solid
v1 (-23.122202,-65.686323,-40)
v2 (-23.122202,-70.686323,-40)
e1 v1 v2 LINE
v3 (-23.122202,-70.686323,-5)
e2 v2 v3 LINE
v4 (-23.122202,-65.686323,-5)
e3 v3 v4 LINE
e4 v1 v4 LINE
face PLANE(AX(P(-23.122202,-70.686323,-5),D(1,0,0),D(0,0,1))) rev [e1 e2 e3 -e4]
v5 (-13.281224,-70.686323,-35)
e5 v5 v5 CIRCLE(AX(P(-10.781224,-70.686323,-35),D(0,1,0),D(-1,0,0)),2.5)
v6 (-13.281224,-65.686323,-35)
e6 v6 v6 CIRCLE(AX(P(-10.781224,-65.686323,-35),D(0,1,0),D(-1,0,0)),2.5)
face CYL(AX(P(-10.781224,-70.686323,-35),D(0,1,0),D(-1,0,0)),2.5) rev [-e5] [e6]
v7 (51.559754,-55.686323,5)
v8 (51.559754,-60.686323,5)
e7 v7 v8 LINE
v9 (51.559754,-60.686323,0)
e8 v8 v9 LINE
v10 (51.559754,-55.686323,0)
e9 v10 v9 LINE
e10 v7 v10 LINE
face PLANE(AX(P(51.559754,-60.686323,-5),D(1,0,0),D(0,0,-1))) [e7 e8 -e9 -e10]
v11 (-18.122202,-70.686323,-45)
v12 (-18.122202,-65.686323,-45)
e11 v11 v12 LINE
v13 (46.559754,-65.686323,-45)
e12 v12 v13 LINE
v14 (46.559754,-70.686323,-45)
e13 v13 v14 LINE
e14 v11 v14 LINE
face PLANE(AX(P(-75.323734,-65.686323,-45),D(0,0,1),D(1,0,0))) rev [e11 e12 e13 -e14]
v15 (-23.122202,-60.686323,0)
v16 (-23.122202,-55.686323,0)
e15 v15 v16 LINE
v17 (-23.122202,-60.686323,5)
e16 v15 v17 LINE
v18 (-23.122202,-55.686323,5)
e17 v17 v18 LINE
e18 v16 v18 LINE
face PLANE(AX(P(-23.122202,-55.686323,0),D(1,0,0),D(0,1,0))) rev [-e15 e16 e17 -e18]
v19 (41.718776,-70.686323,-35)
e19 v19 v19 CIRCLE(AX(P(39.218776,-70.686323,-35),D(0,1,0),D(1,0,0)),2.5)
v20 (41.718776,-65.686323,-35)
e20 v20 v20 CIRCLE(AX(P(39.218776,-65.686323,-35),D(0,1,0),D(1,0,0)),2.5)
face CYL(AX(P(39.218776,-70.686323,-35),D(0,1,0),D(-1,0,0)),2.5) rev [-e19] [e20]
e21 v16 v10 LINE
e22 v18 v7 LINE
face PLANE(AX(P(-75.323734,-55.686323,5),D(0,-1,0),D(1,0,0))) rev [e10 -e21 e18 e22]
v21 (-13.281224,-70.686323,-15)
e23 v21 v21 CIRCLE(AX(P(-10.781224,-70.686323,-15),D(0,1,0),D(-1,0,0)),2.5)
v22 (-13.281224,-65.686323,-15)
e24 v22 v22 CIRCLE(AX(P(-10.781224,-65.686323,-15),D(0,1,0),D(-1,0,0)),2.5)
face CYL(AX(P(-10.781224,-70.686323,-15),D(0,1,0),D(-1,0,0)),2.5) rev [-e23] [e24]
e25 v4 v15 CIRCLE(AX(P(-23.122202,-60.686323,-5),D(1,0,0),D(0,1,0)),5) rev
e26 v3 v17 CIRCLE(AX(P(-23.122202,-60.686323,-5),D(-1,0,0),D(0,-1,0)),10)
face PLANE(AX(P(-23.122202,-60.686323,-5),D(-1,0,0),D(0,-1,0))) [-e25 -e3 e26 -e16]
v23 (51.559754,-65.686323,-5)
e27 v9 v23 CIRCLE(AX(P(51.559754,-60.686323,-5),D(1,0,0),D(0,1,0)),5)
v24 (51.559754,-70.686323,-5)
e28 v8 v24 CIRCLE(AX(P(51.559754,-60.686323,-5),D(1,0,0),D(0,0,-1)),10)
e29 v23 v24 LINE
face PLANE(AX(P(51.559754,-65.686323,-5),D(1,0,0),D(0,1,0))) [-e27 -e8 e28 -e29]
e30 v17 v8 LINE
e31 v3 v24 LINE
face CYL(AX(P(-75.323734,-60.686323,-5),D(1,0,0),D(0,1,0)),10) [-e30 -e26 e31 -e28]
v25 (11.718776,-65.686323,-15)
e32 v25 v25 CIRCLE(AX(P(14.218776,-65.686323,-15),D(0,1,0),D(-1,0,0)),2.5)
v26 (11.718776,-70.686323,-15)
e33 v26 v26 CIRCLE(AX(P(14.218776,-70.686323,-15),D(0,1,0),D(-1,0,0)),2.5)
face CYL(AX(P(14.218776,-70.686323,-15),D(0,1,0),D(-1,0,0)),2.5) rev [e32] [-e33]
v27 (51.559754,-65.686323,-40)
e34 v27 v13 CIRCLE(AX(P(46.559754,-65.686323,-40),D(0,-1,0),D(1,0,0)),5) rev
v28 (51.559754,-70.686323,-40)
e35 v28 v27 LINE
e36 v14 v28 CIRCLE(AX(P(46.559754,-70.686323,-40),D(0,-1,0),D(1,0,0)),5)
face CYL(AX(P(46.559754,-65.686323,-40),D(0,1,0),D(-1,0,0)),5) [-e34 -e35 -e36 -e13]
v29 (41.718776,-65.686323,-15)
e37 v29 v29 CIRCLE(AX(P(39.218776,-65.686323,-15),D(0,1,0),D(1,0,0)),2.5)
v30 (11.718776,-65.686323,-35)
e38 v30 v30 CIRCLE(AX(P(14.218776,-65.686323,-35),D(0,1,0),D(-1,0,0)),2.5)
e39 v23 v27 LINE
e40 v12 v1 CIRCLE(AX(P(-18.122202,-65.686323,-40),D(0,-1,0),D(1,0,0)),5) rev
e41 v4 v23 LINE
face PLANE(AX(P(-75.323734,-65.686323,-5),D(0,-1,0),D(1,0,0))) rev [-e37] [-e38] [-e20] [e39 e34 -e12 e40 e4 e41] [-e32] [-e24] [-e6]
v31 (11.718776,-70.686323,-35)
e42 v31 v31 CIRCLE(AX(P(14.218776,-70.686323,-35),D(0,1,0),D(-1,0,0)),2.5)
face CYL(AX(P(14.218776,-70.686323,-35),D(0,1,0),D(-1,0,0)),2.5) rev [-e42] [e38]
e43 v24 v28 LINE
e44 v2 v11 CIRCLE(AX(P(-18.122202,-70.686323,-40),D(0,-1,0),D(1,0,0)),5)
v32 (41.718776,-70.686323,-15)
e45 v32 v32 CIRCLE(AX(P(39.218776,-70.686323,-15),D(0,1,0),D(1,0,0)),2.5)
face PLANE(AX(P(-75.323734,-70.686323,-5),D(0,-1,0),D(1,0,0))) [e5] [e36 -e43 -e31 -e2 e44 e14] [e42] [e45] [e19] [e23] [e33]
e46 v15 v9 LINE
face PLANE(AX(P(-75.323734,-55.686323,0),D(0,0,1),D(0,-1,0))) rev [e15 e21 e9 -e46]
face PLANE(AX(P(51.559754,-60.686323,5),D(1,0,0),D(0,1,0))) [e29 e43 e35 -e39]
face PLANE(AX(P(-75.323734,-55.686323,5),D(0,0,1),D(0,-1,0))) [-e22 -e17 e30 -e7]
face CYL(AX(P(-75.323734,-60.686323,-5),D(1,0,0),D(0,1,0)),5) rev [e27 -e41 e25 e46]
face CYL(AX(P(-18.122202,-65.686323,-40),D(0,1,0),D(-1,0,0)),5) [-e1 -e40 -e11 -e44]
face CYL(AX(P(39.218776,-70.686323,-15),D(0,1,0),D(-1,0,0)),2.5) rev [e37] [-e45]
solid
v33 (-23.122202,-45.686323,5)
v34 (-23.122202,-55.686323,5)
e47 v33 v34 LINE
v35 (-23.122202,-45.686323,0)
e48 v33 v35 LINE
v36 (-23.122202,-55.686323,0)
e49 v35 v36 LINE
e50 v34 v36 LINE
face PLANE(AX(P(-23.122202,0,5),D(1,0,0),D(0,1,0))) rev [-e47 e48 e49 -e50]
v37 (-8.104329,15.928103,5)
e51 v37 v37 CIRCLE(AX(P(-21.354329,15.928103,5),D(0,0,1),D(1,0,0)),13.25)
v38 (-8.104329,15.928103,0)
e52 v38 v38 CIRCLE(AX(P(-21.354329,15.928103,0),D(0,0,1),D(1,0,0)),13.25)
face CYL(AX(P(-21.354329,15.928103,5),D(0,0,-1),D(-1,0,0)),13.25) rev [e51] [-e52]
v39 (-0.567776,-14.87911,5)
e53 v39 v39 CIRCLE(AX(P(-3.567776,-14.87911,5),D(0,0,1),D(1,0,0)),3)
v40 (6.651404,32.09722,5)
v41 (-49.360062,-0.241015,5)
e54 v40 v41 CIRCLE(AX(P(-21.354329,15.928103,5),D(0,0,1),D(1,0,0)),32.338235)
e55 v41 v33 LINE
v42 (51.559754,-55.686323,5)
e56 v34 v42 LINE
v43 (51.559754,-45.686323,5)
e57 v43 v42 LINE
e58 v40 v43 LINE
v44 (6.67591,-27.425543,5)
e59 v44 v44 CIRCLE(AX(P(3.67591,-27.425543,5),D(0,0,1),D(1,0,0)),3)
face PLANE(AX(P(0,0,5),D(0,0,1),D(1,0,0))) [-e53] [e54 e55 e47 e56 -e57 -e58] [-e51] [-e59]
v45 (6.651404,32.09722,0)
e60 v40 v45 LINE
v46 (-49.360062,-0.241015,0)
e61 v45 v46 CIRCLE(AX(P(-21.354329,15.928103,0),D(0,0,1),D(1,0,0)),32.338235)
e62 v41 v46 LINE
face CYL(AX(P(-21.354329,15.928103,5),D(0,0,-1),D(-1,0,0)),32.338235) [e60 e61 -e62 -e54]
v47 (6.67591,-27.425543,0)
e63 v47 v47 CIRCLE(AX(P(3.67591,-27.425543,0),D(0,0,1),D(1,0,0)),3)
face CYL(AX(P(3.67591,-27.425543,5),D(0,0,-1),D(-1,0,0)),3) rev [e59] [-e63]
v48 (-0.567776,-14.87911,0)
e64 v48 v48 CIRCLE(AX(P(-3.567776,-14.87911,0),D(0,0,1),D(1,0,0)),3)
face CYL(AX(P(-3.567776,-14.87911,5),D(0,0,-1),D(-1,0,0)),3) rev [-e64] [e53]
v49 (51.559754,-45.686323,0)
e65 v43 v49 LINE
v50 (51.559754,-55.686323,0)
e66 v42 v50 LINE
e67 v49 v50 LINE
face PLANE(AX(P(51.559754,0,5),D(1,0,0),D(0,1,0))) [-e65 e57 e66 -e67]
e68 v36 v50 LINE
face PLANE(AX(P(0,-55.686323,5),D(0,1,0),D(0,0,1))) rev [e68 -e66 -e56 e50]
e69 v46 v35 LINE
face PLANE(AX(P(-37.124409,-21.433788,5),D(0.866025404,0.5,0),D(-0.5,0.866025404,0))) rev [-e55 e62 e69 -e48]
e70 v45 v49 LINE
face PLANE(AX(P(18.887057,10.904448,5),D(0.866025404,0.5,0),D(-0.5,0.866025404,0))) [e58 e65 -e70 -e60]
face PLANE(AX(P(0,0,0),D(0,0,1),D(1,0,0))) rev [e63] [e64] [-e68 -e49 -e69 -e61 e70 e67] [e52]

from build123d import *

# Parameters (mm, degrees)
SKETCH_1_R             = 13.25
SKETCH_1_R_2           = 3
EXTRUDE_1_DEPTH        = 5
SM_BASE_FLANGE_1_DEPTH = 74.681955
SKETCH_8_R             = 2.5
CUT_EXTRUDE_1_DEPTH    = 134.765093758
FILLET_1_R             = 5


# Sheet-metal steps are written as plain solids
with BuildPart() as part:
    # Sketch 1 → 凸台-拉伸1 (new body)
    with BuildSketch(Plane.XY):
        with BuildLine():
            Line((-49.360062144, -0.241015089), (-23.122201524, -45.686322765))
            Line((-23.122201524, -45.686322765), (-23.122201524, -55.686322765))
            Line((-23.122201524, -55.686322765), (51.559753885, -55.686322765))
            Line((51.559753885, -55.686322765), (51.559753885, -45.686322765))
            Line((51.559753885, -45.686322765), (6.651404412, 32.097220205))
            ThreePointArc((6.651404412, 32.097220205), (-37.523446513, 43.933835837), (-49.360062144, -0.241015089))
        make_face()
        with Locations((-21.354328866, 15.928102558)):
            Circle(SKETCH_1_R, mode=Mode.SUBTRACT)
        with Locations((-3.567776343, -14.879110103)):
            Circle(SKETCH_1_R_2, mode=Mode.SUBTRACT)
        with Locations((3.675910259, -27.425543331)):
            Circle(SKETCH_1_R_2, mode=Mode.SUBTRACT)
    extrude(amount=EXTRUDE_1_DEPTH)


with BuildPart() as body_2:
    # 草图3 → 基体-法兰1 (new body)
    with BuildSketch(Plane(origin=(51.559753885, 0, 0), x_dir=(0, 0, -1), z_dir=(1, 0, 0))):
        with BuildLine():
            Line((0, -55.686322765), (0, -60.686322765))
            ThreePointArc((0, -60.686322765), (1.464466094, -64.221856671), (5, -65.686322765))
            Line((5, -65.686322765), (45, -65.686322765))
            Line((45, -65.686322765), (45, -70.686322765))
            Line((45, -70.686322765), (5, -70.686322765))
            ThreePointArc((5, -70.686322765), (-2.071067812, -67.757390577), (-5, -60.686322765))
            Line((-5, -60.686322765), (-5, -55.686322765))
            Line((-5, -55.686322765), (0, -55.686322765))
        make_face()
    extrude(amount=-SM_BASE_FLANGE_1_DEPTH)

    # 草图8 → 切除-拉伸1 (cut, through all)
    with BuildSketch(Plane(origin=(0, -65.686322765, 0), x_dir=(1, 0, 0), z_dir=(0, 1, 0))):
        with Locations(Location((14.21877618, 35, 0), (0, 0, 180))):
            Circle(SKETCH_8_R)
        with Locations(Location((-10.78122382, 35, 0), (0, 0, 180))):
            Circle(SKETCH_8_R)
        with Locations(Location((-10.78122382, 15, 0), (0, 0, 180))):
            Circle(SKETCH_8_R)
        with Locations((39.21877618, 15)):
            Circle(SKETCH_8_R)
        with Locations((39.21877618, 35)):
            Circle(SKETCH_8_R)
        with Locations(Location((14.21877618, 15, 0), (0, 0, 180))):
            Circle(SKETCH_8_R)
    extrude(amount=-CUT_EXTRUDE_1_DEPTH, mode=Mode.SUBTRACT)

    # 圆角1
    fillet_1_edges = [body_2.edges().sort_by_distance(p)[0] for p in [
        (-23.122201115, -68.186322765, -45),
        (51.559753885, -68.186322765, -45),
    ]]
    fillet(fillet_1_edges, radius=FILLET_1_R)


solid = Compound([part.part, body_2.part])
